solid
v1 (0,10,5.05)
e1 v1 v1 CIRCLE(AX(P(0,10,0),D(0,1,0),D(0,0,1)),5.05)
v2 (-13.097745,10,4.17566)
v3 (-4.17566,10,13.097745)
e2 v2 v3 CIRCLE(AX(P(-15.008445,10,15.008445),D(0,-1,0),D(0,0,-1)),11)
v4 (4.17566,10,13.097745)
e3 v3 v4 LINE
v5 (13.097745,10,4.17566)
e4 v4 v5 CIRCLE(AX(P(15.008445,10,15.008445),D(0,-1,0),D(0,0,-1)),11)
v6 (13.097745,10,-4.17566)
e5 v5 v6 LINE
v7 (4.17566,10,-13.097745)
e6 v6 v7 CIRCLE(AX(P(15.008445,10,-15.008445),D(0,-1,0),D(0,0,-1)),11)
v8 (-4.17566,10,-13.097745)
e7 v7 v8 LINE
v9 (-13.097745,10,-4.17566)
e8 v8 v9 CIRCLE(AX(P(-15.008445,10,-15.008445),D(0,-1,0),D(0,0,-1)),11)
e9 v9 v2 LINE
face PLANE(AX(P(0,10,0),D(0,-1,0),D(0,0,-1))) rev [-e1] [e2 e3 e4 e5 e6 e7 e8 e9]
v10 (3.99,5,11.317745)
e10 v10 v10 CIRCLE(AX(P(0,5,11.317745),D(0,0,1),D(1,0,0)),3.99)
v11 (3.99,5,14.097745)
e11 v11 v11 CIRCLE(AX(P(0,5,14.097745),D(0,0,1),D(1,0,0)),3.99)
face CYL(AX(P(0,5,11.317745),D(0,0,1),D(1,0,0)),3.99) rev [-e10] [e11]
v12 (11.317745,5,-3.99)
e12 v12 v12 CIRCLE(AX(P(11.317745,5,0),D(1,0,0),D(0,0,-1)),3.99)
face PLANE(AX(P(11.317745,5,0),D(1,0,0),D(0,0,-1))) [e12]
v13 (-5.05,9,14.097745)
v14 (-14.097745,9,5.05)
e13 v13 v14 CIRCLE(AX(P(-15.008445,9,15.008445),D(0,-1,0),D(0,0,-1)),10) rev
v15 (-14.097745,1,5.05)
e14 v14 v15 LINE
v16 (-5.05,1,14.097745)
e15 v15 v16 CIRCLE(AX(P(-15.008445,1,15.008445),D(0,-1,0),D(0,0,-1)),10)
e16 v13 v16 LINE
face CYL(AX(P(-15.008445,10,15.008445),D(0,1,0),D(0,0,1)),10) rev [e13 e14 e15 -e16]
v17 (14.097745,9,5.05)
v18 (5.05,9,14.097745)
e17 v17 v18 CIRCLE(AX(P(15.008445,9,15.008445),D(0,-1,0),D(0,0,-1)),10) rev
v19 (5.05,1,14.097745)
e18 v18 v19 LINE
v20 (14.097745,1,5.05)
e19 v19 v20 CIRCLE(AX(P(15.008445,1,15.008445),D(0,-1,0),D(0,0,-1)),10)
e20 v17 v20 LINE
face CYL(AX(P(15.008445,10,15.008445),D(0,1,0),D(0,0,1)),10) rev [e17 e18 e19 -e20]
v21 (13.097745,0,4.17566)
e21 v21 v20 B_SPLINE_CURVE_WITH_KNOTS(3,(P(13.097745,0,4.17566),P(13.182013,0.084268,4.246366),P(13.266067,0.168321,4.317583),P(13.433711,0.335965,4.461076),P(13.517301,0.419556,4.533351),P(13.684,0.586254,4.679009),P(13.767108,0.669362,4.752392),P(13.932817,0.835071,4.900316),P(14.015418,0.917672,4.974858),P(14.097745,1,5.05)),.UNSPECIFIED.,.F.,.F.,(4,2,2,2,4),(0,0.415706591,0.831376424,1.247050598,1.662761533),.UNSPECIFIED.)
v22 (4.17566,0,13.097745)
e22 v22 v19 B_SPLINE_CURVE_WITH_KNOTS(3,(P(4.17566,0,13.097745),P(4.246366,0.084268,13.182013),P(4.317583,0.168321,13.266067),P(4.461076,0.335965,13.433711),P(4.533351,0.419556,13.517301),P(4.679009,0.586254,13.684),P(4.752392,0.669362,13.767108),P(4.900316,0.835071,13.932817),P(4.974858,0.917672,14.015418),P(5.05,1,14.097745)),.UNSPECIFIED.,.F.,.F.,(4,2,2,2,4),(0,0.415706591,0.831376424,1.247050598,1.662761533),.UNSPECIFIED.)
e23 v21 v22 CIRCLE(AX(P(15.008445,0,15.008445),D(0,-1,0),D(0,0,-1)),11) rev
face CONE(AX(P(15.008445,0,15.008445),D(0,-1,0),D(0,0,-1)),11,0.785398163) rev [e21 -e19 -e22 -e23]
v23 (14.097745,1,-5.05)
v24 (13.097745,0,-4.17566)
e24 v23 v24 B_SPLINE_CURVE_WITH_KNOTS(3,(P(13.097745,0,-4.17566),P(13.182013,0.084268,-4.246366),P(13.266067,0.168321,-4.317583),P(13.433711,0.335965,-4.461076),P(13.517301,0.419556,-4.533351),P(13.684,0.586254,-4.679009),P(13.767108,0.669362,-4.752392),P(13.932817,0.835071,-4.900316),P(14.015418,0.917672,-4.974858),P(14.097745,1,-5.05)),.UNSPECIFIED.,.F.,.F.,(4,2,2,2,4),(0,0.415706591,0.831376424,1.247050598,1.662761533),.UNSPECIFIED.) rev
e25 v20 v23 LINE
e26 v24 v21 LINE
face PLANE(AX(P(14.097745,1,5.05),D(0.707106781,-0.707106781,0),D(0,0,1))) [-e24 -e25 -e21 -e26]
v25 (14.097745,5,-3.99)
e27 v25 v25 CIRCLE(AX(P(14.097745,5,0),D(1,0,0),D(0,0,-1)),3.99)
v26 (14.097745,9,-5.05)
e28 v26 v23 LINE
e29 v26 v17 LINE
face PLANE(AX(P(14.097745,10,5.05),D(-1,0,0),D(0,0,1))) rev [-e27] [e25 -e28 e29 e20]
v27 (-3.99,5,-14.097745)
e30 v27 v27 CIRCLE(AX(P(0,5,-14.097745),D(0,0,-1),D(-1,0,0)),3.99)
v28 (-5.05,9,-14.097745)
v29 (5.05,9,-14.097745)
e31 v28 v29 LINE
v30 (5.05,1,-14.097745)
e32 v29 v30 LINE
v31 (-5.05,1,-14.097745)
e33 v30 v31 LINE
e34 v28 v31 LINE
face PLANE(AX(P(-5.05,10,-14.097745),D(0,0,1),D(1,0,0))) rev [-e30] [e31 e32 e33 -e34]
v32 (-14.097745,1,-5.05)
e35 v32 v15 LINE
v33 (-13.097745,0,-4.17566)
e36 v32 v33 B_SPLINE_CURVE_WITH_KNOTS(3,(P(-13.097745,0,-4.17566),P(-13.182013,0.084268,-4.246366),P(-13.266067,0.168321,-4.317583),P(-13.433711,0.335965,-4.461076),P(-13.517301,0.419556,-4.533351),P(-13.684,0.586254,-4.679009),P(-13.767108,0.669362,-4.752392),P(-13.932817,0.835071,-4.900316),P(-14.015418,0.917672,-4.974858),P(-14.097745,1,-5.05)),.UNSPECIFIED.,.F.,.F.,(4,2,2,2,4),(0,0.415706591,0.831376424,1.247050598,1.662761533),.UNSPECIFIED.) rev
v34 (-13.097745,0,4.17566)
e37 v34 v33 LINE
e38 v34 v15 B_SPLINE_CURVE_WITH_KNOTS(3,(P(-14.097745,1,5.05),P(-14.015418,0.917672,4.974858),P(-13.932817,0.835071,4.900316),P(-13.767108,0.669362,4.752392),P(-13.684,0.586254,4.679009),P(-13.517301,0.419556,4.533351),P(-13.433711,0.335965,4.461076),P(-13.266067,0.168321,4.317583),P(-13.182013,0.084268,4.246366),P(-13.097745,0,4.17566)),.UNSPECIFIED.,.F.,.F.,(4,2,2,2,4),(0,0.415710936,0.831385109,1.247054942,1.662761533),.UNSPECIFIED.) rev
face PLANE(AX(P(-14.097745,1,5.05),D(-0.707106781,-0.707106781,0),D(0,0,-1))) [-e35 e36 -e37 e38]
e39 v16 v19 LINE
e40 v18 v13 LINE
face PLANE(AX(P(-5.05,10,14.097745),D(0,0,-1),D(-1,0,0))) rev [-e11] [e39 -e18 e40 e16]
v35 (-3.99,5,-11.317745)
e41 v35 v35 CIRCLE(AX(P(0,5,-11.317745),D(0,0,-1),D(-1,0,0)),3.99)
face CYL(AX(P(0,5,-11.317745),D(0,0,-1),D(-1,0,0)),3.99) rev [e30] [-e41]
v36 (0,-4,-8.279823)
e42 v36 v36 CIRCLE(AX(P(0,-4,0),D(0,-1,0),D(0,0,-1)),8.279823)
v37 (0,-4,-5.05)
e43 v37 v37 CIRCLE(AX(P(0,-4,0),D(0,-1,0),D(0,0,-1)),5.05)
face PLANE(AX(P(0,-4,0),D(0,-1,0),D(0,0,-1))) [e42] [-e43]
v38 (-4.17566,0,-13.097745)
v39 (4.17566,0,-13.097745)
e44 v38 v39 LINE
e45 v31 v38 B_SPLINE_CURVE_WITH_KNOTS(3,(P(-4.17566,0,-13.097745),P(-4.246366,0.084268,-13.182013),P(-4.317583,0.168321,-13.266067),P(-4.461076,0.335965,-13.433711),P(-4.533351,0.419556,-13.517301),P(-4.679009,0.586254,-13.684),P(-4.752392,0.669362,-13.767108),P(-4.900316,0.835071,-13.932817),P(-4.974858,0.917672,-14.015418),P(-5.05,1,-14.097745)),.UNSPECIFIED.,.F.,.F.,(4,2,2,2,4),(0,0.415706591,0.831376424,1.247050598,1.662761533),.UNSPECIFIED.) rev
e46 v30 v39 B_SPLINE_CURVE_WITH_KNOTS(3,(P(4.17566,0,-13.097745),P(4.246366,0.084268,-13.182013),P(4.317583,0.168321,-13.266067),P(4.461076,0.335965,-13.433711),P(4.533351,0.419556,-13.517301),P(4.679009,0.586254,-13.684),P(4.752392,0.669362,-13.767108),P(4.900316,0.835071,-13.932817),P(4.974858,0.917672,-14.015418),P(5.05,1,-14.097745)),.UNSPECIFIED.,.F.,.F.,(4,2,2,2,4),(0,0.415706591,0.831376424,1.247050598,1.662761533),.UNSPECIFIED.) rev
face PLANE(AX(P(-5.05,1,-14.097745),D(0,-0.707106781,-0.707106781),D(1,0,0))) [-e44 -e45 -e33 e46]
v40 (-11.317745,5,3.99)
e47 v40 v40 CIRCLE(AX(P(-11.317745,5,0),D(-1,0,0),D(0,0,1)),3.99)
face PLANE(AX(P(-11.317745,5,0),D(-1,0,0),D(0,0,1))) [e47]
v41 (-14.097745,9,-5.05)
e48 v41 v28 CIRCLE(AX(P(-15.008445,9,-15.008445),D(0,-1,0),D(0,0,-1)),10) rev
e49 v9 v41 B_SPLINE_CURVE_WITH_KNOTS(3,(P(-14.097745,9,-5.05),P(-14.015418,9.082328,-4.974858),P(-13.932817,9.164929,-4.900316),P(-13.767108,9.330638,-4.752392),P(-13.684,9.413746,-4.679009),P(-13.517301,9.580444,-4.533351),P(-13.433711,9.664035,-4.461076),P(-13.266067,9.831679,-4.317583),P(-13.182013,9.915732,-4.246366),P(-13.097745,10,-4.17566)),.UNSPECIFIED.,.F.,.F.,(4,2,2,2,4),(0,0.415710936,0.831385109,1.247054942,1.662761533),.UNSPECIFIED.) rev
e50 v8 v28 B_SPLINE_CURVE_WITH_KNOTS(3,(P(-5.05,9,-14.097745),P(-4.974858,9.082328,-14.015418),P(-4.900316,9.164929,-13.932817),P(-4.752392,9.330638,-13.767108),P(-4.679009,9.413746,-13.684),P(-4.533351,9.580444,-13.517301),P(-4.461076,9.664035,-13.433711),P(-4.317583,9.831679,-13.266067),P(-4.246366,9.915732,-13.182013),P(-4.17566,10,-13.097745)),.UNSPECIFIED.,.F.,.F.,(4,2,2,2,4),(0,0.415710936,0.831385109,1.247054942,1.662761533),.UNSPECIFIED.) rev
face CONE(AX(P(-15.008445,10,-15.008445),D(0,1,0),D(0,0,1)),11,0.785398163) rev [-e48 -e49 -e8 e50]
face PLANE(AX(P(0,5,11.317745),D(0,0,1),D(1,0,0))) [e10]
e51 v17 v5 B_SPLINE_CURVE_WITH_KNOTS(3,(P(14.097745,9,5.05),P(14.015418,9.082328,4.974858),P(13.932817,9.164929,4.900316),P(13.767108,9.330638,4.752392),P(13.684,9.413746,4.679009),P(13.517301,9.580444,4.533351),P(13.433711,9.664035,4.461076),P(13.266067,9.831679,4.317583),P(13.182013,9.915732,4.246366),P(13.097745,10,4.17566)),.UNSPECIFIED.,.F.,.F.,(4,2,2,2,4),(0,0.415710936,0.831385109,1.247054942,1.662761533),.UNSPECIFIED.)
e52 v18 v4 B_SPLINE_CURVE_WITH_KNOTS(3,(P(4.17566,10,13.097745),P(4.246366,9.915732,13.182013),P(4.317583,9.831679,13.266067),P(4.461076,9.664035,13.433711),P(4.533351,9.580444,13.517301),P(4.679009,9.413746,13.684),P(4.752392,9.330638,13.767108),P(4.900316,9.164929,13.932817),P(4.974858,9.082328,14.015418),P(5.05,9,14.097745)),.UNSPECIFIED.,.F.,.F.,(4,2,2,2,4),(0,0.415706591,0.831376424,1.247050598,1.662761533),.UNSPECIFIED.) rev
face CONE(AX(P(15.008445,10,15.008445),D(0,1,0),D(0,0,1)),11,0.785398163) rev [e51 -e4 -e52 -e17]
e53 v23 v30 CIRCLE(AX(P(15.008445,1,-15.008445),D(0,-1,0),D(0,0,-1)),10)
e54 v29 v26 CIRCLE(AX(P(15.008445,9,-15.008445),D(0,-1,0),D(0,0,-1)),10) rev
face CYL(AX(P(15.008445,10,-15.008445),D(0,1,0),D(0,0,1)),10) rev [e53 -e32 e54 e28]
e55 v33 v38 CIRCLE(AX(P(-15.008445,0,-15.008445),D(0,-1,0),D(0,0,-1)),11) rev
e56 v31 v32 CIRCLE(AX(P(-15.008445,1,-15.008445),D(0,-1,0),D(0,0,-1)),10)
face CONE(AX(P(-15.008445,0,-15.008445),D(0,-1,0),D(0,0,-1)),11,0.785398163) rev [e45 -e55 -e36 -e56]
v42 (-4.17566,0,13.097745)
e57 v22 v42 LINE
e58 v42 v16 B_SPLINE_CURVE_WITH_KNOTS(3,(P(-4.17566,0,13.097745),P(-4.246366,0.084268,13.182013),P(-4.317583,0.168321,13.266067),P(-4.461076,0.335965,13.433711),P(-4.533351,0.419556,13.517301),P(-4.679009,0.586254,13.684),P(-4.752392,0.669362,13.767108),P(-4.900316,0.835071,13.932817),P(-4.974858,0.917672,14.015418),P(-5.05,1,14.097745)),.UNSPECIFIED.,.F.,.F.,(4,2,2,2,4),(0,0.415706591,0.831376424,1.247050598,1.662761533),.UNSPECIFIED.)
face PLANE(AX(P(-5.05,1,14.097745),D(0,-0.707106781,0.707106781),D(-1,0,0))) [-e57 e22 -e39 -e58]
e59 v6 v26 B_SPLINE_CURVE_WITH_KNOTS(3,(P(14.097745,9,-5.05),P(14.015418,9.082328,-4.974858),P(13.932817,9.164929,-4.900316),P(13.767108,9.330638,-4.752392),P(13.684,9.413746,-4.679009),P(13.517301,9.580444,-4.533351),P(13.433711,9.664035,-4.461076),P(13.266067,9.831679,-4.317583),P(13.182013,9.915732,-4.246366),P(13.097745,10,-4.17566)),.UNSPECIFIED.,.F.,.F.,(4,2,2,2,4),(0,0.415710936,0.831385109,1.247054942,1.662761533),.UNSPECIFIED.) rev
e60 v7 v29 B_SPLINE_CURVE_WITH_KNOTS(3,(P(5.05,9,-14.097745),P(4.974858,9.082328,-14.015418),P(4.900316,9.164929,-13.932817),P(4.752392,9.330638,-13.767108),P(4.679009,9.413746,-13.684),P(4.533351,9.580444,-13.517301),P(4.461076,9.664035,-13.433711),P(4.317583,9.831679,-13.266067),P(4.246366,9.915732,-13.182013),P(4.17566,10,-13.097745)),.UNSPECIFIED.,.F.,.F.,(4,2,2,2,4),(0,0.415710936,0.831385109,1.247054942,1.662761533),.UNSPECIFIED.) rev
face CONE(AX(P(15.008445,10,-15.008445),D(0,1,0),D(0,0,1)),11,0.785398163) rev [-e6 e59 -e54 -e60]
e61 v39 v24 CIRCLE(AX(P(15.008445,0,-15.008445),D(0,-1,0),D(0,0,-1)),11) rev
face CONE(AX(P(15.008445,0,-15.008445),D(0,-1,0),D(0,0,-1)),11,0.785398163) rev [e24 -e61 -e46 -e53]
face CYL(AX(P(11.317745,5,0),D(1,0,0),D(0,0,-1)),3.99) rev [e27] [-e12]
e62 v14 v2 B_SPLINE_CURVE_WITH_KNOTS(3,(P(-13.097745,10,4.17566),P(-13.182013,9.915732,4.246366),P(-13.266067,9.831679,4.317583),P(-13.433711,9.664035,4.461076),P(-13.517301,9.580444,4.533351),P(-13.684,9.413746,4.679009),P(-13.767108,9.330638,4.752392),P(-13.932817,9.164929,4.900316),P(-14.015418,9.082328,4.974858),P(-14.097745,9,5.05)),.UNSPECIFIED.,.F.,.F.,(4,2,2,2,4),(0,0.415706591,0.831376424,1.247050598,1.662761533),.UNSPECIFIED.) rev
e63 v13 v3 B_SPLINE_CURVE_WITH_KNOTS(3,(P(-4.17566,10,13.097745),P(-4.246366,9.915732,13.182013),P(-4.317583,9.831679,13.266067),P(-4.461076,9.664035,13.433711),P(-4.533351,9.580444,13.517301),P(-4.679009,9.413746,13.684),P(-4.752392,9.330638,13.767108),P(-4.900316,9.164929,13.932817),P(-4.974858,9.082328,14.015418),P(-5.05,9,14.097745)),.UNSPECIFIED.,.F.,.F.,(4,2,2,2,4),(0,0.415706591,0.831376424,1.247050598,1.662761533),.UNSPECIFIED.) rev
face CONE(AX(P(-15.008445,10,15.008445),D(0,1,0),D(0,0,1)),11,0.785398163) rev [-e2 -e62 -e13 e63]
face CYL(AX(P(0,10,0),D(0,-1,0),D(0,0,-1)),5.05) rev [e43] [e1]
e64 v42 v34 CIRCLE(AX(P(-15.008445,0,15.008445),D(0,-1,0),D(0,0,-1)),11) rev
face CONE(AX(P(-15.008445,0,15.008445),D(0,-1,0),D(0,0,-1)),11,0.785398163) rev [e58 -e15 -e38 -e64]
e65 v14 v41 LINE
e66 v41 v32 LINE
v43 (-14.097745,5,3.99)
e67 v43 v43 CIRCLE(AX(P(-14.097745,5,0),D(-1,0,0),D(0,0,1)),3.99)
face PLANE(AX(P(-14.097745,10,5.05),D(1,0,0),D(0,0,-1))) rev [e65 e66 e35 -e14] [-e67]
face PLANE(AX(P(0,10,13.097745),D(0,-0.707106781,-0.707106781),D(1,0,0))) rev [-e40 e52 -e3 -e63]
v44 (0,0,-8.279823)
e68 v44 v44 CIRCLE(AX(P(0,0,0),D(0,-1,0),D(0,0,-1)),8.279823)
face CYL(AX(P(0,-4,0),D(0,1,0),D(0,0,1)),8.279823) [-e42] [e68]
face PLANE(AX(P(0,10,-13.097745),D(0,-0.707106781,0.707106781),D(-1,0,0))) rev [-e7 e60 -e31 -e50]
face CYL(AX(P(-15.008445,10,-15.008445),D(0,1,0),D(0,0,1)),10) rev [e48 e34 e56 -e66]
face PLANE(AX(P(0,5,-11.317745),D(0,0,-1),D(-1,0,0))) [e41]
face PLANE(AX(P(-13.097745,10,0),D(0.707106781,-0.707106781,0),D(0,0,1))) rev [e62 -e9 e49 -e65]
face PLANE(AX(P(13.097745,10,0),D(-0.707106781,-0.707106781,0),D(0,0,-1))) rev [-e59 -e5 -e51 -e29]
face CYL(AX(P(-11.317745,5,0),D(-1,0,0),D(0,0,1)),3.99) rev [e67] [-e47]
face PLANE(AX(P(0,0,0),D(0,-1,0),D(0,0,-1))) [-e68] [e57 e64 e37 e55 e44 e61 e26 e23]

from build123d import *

# Parameters (mm, degrees)
SKETCH1_R           = 5.05
BOSS_EXTRUDE1_DEPTH = 10
SKETCH2_R           = 3.99
CUT_EXTRUDE1_DEPTH  = 2.78
CIRPATTERN1_COUNT   = 4
FILLET1_R           = 10
CHAMFER1_SIZE       = 1
BOSS_EXTRUDE2_START = 4
SKETCH3_R           = 8.279823011
SKETCH3_R_2         = 5.05
BOSS_EXTRUDE2_DEPTH = 4


with BuildPart() as part:
    # Sketch1 → Boss-Extrude1 (new body)
    with BuildSketch(Plane(origin=(0, 0, 0), x_dir=(1, 0, 0), z_dir=(0, 1, 0))):
        Polygon((-5.05, 5.05), (-5.05, 14.097745365), (5.05, 14.097745365), (5.05, 5.05), (14.097745365, 5.05), (14.097745365, -5.05), (5.05, -5.05), (5.05, -14.097745365), (-5.05, -14.097745365), (-5.05, -5.05), (-14.097745365, -5.05), (-14.097745365, 5.05), align=None)
        with Locations(Location((0, 0, 0), (0, 0, 270))):
            Circle(SKETCH1_R, mode=Mode.SUBTRACT)
    extrude(amount=BOSS_EXTRUDE1_DEPTH)

    # Sketch2 → Cut-Extrude1 (cut)
    with BuildSketch(Plane.XY.offset(14.097745365)):
        with Locations((0, 5)):
            Circle(SKETCH2_R)
    cut_extrude1 = extrude(amount=-CUT_EXTRUDE1_DEPTH, mode=Mode.SUBTRACT)

    # CirPattern1: Cut-Extrude1 ×4 about axis
    cirpattern1_axis = Axis((0, 0, 0), (0, 1, 0))
    for i in range(1, CIRPATTERN1_COUNT):
        add(cut_extrude1.rotate(cirpattern1_axis, i * 360 / CIRPATTERN1_COUNT), mode=Mode.SUBTRACT)

    # Fillet1
    # the kernel refuses this fillet: 10 mm, written as the material it adds along each edge
    with BuildSketch(Plane(origin=(5.05, 0, 5.05), x_dir=(1, 0, 0), z_dir=(0, 1, 0)), Plane(origin=(-5.05, 0, 5.05), x_dir=(0, 0, 1), z_dir=(0, 1, 0)), Plane(origin=(5.05, 0, -5.05), x_dir=(0, 0, -1), z_dir=(0, 1, 0))) as fillet1_piece_1:
        with BuildLine():
            CenterArc((9.95844497, -9.95844497), FILLET1_R, 95.225164117, 79.549671766)
            Line((0, -9.047745365), (0, 0))
            Line((0, 0), (9.047745365, 0))
        make_face()
    extrude(amount=10)
    with BuildSketch(Plane(origin=(-5.05, 0, -5.05), x_dir=(0, 0, -1), z_dir=(0, 1, 0))) as fillet1_piece_2:
        with BuildLine():
            CenterArc((9.95844497, 9.95844497), FILLET1_R, 185.225164117, 79.549671766)
            Line((0, 9.047745365), (0, 0))
            Line((0, 0), (9.047745365, 0))
        make_face()
    extrude(amount=10)

    # Chamfer1
    chamfer1_edges = [part.edges().sort_by_distance(p)[0] for p in [
        (0, 10, 14.097745365),
        (-14.097745365, 0, 0),
        (0, 0, -14.097745365),
        (14.097745365, 0, 0),
        (0, 0, 14.097745365),
        (14.097745365, 10, 0),
        (0, 10, -14.097745365),
        (-14.097745365, 10, 0),
        (7.937377159, 0, 7.937377159),
        (7.937377159, 10, 7.937377159),
        (-7.937377159, 0, 7.937377159),
        (-7.937377159, 10, 7.937377159),
        (-7.937377159, 0, -7.937377159),
        (-7.937377159, 10, -7.937377159),
        (7.937377159, 0, -7.937377159),
        (7.937377159, 10, -7.937377159),
    ]]
    chamfer(chamfer1_edges, length=CHAMFER1_SIZE)

    # Sketch3 → Boss-Extrude2 (add)
    with BuildSketch(Plane.XZ.offset(BOSS_EXTRUDE2_START)):
        with Locations(Location((0, 0, 0), (0, 0, 270))):
            Circle(SKETCH3_R)
        with Locations(Location((0, 0, 0), (0, 0, 270))):
            Circle(SKETCH3_R_2, mode=Mode.SUBTRACT)
    extrude(amount=-BOSS_EXTRUDE2_DEPTH)


solid = part.part
